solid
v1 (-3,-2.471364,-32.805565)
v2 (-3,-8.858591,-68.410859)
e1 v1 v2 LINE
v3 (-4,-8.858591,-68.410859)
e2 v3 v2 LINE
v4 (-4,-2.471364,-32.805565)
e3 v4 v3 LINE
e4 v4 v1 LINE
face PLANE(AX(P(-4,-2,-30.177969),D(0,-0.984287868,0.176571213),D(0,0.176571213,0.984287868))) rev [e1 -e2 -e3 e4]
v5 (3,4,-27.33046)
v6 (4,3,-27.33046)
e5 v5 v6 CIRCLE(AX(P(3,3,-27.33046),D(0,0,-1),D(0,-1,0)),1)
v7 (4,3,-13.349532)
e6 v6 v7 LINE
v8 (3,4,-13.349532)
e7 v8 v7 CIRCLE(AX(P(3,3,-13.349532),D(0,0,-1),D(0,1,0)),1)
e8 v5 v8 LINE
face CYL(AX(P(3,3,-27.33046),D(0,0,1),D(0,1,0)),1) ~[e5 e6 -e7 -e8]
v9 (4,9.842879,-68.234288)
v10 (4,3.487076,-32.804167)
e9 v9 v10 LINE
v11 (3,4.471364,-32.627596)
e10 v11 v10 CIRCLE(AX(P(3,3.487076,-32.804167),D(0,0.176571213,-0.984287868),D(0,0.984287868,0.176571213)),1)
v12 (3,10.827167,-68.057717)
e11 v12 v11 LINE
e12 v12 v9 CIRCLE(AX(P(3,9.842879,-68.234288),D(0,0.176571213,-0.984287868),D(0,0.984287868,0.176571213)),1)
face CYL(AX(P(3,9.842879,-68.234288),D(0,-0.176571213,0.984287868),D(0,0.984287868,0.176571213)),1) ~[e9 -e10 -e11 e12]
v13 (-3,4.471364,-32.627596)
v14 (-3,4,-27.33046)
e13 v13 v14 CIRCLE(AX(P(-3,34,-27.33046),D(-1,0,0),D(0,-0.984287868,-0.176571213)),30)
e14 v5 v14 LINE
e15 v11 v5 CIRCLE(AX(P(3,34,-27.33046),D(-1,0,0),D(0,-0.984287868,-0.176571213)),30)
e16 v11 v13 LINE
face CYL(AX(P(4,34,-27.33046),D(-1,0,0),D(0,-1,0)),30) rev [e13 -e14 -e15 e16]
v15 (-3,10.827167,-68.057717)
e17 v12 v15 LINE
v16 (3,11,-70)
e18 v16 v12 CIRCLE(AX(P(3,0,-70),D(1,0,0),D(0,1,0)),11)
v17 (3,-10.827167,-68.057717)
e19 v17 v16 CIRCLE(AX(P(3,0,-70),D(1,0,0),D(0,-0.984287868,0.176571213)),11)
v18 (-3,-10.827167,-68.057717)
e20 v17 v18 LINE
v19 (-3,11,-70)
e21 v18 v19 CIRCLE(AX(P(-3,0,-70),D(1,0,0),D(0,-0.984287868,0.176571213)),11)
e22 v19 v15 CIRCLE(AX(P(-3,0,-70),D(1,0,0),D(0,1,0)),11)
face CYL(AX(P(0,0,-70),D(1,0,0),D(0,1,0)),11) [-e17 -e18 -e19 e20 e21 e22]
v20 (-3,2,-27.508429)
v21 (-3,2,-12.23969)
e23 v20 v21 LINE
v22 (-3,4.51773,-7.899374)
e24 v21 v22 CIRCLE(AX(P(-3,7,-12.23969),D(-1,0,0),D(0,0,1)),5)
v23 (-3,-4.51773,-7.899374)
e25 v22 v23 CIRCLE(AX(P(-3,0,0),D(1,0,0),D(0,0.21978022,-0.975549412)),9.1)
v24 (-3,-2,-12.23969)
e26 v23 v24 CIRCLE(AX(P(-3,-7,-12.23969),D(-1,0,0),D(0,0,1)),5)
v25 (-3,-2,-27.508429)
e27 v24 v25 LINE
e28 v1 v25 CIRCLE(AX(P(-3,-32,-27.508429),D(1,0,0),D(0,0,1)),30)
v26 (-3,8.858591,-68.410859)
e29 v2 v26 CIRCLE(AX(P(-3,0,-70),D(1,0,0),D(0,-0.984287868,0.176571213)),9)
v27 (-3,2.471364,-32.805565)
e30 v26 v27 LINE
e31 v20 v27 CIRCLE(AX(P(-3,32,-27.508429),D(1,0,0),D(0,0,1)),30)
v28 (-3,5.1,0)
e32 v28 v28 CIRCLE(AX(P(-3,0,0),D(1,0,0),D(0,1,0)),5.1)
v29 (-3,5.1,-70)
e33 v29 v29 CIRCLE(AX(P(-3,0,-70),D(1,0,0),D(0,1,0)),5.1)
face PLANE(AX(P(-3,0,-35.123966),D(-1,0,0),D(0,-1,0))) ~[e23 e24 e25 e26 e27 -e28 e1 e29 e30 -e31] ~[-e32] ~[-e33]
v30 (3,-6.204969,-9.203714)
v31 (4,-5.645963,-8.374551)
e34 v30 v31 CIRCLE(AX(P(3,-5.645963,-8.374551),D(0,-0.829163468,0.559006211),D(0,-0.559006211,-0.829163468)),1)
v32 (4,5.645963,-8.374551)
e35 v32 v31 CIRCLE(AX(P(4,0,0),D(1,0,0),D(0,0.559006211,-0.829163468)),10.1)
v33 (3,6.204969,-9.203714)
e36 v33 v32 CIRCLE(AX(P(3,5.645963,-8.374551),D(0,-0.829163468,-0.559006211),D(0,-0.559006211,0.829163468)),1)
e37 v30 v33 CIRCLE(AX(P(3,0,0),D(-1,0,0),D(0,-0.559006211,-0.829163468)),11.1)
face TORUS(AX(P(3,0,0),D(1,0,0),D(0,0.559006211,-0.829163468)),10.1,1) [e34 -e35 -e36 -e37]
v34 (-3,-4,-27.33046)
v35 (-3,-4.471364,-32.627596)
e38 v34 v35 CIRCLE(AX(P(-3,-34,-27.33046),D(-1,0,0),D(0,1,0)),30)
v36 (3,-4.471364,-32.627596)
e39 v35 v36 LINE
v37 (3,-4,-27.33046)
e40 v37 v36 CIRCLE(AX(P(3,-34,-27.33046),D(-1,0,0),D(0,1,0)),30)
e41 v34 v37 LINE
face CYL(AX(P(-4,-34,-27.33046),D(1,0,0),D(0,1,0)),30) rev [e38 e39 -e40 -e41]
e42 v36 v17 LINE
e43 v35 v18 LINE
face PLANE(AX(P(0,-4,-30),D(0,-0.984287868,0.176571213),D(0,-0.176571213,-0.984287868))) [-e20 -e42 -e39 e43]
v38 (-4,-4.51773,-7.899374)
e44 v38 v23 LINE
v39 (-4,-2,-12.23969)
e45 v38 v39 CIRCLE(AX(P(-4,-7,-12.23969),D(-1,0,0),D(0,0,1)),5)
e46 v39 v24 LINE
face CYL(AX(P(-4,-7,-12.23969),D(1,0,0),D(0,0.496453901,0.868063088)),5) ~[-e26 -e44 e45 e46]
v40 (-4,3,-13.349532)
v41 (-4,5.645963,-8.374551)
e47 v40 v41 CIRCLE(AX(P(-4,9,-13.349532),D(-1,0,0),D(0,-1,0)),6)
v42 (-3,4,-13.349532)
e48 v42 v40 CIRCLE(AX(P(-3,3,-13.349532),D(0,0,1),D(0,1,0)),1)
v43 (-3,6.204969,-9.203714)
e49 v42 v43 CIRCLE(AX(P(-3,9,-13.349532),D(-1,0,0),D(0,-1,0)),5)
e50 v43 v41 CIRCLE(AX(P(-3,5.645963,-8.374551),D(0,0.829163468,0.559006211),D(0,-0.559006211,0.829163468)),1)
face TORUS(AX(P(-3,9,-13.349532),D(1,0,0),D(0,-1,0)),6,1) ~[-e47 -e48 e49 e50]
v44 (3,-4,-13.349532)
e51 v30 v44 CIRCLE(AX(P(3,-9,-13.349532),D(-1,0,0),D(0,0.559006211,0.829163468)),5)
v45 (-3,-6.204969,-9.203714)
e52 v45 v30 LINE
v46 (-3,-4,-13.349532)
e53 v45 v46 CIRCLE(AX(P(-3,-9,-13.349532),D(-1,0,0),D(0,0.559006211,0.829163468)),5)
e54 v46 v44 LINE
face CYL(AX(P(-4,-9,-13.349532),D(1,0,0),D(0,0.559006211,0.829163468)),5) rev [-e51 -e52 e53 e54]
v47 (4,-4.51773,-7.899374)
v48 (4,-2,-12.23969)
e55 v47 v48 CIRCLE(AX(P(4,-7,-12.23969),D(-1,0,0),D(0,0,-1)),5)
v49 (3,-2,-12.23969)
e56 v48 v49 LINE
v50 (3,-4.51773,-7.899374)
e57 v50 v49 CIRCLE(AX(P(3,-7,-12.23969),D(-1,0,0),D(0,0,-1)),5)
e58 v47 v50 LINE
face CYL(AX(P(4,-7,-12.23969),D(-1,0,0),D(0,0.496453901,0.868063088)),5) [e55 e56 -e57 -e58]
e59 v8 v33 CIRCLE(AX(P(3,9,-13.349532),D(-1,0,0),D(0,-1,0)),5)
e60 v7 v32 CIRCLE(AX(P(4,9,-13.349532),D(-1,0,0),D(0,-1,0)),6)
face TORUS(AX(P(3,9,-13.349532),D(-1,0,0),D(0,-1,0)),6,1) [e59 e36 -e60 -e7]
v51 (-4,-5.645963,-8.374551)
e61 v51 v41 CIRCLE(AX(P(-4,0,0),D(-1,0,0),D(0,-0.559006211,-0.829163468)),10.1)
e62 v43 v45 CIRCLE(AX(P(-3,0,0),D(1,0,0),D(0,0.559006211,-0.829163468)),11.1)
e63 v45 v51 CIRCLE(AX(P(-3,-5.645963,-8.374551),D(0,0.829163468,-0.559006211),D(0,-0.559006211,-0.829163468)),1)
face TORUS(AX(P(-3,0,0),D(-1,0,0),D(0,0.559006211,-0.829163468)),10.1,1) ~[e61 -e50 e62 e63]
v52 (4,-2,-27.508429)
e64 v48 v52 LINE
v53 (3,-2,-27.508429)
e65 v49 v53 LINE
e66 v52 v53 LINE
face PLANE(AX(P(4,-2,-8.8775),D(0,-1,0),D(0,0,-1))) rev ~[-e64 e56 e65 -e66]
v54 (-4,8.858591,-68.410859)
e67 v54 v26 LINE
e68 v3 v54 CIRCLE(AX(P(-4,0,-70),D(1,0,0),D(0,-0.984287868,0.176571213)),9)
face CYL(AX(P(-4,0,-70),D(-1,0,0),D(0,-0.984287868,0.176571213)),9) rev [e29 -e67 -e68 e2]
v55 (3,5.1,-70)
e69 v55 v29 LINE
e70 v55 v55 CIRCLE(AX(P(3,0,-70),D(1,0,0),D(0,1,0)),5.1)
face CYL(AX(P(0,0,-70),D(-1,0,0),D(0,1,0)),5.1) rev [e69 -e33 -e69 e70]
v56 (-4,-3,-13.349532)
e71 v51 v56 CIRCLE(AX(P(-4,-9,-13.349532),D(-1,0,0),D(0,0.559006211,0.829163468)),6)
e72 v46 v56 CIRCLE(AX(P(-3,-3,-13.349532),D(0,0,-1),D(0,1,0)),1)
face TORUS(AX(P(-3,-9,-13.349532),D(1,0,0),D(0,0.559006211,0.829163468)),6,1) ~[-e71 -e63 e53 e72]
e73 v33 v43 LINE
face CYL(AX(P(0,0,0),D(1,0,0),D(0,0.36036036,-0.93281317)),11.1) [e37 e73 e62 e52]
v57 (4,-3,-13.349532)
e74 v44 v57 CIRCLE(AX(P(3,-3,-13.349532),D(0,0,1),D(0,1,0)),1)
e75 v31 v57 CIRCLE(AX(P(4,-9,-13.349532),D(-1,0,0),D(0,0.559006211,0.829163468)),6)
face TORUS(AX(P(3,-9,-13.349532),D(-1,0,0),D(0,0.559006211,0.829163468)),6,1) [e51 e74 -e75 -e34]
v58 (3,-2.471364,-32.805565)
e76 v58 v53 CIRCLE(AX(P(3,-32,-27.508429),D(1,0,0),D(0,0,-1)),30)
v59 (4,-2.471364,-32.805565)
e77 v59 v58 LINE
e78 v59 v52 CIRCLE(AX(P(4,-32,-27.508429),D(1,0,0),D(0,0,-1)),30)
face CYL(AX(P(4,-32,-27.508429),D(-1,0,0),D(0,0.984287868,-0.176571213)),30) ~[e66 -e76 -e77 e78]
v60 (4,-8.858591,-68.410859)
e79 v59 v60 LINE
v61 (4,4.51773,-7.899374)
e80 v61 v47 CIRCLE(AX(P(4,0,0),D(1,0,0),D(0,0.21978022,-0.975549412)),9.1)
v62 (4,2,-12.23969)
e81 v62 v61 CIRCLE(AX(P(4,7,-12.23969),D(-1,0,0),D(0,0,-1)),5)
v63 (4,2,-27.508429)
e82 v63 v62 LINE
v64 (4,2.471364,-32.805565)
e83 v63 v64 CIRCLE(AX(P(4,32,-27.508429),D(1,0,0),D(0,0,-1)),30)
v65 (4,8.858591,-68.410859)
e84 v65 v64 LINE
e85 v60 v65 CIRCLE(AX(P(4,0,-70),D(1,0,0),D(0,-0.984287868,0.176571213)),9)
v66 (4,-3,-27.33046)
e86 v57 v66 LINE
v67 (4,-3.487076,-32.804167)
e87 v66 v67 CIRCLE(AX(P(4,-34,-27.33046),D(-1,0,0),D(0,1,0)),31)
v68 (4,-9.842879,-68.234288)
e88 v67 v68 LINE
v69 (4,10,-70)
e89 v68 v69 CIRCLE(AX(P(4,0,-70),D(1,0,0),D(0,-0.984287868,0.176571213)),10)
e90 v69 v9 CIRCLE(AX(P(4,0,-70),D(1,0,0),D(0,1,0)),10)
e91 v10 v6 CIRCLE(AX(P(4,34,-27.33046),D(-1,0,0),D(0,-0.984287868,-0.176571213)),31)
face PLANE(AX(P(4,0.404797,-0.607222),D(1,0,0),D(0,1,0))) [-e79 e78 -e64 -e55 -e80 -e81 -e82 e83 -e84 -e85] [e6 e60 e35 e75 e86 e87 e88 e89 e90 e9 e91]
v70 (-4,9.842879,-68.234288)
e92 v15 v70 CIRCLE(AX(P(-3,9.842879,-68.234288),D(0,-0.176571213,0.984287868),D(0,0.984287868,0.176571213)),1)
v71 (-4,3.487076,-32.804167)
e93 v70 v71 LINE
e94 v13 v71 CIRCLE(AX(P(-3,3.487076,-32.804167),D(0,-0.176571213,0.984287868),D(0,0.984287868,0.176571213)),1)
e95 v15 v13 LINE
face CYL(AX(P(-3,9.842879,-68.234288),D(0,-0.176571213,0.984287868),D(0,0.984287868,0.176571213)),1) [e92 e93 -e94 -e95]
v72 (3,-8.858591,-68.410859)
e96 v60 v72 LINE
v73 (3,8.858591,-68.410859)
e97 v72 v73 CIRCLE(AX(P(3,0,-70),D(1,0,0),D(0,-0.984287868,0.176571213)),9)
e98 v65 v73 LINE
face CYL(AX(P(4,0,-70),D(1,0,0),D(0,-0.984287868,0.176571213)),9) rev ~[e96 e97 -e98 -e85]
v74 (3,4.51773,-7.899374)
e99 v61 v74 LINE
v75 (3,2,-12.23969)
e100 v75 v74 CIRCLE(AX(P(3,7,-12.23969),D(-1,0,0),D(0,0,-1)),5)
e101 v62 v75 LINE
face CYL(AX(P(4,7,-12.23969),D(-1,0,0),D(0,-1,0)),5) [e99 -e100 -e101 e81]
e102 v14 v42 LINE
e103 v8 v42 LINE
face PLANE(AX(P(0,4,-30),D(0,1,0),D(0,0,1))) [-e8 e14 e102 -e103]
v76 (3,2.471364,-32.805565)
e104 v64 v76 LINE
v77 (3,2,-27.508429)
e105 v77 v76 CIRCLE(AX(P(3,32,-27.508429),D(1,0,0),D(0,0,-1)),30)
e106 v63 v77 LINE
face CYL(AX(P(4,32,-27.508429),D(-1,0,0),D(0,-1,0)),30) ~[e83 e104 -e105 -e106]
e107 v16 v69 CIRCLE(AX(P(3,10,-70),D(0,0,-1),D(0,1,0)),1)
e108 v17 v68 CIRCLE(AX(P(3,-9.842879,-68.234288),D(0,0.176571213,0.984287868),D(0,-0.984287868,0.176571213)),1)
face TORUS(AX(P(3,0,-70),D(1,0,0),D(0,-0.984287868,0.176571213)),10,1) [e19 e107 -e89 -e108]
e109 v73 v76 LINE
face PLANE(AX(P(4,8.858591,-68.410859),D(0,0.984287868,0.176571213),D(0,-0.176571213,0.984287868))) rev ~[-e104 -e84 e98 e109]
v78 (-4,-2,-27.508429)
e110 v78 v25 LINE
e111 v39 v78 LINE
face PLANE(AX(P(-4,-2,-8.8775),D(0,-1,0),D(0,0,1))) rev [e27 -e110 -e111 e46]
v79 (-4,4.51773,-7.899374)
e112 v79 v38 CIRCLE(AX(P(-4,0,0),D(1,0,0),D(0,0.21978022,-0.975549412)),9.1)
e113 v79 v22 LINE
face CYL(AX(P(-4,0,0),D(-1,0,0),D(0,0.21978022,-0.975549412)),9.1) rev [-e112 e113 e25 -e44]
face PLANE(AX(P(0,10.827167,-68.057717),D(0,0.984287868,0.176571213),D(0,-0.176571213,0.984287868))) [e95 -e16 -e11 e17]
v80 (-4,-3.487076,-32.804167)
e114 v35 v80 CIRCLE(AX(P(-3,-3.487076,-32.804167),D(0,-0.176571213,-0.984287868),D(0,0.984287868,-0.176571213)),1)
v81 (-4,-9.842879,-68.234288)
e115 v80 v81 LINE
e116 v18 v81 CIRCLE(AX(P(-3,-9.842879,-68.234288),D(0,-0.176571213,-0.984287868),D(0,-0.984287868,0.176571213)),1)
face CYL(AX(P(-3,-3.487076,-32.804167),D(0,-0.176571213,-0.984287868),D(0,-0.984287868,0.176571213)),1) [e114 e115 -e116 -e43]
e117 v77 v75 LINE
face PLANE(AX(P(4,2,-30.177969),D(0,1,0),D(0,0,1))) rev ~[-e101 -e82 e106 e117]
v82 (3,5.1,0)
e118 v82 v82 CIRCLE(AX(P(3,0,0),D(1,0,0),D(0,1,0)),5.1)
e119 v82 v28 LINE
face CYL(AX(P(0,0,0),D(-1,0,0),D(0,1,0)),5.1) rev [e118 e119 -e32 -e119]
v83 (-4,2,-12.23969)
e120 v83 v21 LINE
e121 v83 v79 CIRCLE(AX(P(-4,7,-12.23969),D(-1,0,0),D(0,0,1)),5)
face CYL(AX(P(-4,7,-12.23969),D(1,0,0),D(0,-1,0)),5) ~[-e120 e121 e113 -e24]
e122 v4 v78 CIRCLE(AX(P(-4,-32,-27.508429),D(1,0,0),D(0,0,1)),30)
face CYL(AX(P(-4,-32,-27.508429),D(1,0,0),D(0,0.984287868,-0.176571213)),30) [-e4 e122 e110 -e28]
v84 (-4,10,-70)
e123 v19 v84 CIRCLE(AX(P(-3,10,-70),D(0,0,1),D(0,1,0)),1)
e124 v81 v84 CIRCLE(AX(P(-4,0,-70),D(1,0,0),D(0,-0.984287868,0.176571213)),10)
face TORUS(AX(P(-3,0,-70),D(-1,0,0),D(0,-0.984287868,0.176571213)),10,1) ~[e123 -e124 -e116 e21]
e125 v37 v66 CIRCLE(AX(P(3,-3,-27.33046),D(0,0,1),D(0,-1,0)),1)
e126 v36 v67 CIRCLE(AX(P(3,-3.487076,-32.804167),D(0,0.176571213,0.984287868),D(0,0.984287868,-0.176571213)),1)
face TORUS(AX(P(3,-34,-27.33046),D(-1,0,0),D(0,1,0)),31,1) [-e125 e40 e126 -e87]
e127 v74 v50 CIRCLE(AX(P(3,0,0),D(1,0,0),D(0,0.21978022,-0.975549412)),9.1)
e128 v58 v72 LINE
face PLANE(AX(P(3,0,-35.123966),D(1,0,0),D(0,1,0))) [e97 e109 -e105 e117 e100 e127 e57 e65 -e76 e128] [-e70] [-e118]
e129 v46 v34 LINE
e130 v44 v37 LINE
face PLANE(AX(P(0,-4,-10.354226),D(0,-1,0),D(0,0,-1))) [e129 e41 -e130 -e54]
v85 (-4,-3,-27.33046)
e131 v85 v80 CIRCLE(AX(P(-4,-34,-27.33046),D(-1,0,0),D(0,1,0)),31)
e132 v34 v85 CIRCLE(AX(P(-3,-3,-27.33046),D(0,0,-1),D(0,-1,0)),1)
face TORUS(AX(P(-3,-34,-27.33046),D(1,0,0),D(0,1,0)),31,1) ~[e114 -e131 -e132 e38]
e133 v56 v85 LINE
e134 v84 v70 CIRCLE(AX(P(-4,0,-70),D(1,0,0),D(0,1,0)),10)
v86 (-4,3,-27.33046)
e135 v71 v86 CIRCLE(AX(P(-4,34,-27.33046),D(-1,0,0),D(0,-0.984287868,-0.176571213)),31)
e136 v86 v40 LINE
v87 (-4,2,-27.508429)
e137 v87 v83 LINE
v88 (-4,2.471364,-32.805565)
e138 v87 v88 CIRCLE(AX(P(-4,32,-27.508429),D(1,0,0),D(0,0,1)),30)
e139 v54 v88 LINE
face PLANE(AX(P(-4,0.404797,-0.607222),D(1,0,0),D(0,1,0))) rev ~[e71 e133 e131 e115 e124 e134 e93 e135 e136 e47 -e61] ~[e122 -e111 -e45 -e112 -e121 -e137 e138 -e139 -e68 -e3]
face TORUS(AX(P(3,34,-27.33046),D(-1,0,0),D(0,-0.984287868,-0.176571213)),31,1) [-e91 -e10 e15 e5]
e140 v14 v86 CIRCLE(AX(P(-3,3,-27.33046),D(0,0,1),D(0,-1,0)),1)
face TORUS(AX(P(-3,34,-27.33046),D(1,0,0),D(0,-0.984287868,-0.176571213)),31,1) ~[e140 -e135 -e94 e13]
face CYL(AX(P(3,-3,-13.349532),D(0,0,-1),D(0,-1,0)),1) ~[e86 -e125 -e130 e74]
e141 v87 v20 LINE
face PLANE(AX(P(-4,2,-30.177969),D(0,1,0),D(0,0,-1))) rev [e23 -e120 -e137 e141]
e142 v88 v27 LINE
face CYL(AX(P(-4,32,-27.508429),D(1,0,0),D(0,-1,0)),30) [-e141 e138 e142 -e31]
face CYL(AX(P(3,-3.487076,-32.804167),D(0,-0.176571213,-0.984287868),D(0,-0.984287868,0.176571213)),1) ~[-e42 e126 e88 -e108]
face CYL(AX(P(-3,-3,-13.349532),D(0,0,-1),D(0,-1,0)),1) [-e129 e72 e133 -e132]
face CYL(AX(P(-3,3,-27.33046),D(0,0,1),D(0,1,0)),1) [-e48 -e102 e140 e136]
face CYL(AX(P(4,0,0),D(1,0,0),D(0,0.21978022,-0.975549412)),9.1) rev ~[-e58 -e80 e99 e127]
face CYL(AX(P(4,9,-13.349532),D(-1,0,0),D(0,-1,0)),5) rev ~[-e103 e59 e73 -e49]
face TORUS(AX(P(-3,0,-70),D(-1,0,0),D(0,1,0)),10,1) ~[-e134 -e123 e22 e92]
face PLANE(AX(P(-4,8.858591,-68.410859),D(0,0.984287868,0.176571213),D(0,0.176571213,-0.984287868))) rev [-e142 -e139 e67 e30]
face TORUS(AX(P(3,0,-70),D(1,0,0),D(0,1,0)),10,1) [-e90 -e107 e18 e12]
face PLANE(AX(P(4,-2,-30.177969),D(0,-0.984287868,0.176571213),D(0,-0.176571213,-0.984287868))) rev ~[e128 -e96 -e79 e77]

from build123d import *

# Parameters (mm, degrees)
F0_R     = 5.1
F1_DEPTH = 4
F2_R     = 5.1
F3_DEPTH = 1
F4_R     = 30
F5_R     = 5
F6_R     = 5
F7_R     = 30
F8_R     = 1
F9_R     = 1


# Not quite as in the source:
# - a pattern or mirror of a feature is missing from the dataset's text; its kind, count and spacing are read off the source's solid


with BuildPart() as f1:
    # F0 (on Right) → F1 (new body, symmetric)
    with BuildSketch(Plane.YZ):
        with BuildLine():
            ThreePointArc((4, -10.3542261903), (9.1545070867, -6.2773402011), (11.1, 0))
            ThreePointArc((11.1, 0), (-6.2773402011, 9.1545070867), (-4, -10.3542261903))
            ThreePointArc((-4, -10.3542261903), (0, -11.1), (4, -10.3542261903))
        make_face()
        Circle(F0_R, mode=Mode.SUBTRACT)
        with BuildLine():
            ThreePointArc((4, -10.3542261903), (0, -11.1), (-4, -10.3542261903))
            Line((-4, -10.3542261903), (-4, -30))
            Line((-4, -30), (-10.8271665456, -68.0577166546))
            ThreePointArc((-10.8271665456, -68.0577166546), (0, -59), (10.8271665456, -68.0577166546))
            Line((10.8271665456, -68.0577166546), (4, -30))
            Line((4, -30), (4, -10.3542261903))
        make_face()
        with BuildLine():
            ThreePointArc((10.8271665456, -68.0577166546), (0, -59), (-10.8271665456, -68.0577166546))
            ThreePointArc((-10.8271665456, -68.0577166546), (-0.9749789737, -80.9567064395), (11, -70))
            ThreePointArc((11, -70), (10.9567064395, -69.0250210263), (10.8271665456, -68.0577166546))
        make_face()
        with Locations((0, -70)):
            Circle(F0_R, mode=Mode.SUBTRACT)
    extrude(amount=F1_DEPTH, both=True)

    # F2 (on face) → F3 (cut)
    with BuildSketch(Plane.YZ.offset(4)):
        with BuildLine():
            Line((2, -30.1779693522), (2, -8.877499648))
            ThreePointArc((2, -8.877499648), (0, 9.1), (-2, -8.877499648))
            Line((-2, -8.877499648), (-2, -30.1779693522))
            Line((-2, -30.1779693522), (-8.85859081, -68.410859081))
            ThreePointArc((-8.85859081, -68.410859081), (0, -79), (8.85859081, -68.410859081))
            Line((8.85859081, -68.410859081), (2, -30.1779693522))
        make_face()
        with Locations((0, -70)):
            Circle(F2_R, mode=Mode.SUBTRACT)
        Circle(F2_R, mode=Mode.SUBTRACT)
    f3 = extrude(amount=-F3_DEPTH, mode=Mode.SUBTRACT)

    # F3_copies: F3 across plane
    add(f3.mirror(Plane(origin=(0, 0, 0), x_dir=(0, 0, -1), z_dir=(-1, 0, 0))), mode=Mode.SUBTRACT)

    # F4
    f4_edges = [f1.edges().sort_by_distance(p)[0] for p in [
        (0, -4, -30),
        (0, 4, -30),
    ]]
    fillet(f4_edges, radius=F4_R)

    # F5
    f5_edges = [f1.edges().sort_by_distance(p)[0] for p in [
        (0, -4, -10.354226),
        (0, 4, -10.354226),
    ]]
    fillet(f5_edges, radius=F5_R)

    # F6
    f6_edges = [f1.edges().sort_by_distance(p)[0] for p in [
        (3.5, -2, -8.8775),
        (3.5, 2, -8.8775),
        (-3.5, 2, -8.8775),
        (-3.5, -2, -8.8775),
    ]]
    fillet(f6_edges, radius=F6_R)

    # F7
    f7_edges = [f1.edges().sort_by_distance(p)[0] for p in [
        (-3.5, 2, -30.177969),
        (-3.5, -2, -30.177969),
        (3.5, 2, -30.177969),
        (3.5, -2, -30.177969),
    ]]
    fillet(f7_edges, radius=F7_R)

    # F8
    f8_edges = [f1.edges().sort_by_distance(p)[0] for p in [
        (4, 0, 11.1),
        (4, -4.585526, -11.001677),
        (4, -4, -20.339996),
        (4, -4.118073, -29.989493),
        (4, -7.649265, -50.342656),
        (4, 0, -81),
        (4, 7.649265, -50.342656),
        (4, 4.118073, -29.989493),
        (4, 4, -20.339996),
        (4, 4.585526, -11.001677),
    ]]
    fillet(f8_edges, radius=F8_R)

    # F9
    f9_edges = [f1.edges().sort_by_distance(p)[0] for p in [
        (-4, 0, 11.1),
        (-4, -4.585526, -11.001677),
        (-4, 4.585526, -11.001677),
        (-4, 4, -20.339996),
        (-4, -4, -20.339996),
        (-4, -4.118073, -29.989493),
        (-4, -7.649265, -50.342656),
        (-4, 0, -81),
        (-4, 7.649265, -50.342656),
        (-4, 4.118073, -29.989493),
    ]]
    fillet(f9_edges, radius=F9_R)


solid = f1.part
